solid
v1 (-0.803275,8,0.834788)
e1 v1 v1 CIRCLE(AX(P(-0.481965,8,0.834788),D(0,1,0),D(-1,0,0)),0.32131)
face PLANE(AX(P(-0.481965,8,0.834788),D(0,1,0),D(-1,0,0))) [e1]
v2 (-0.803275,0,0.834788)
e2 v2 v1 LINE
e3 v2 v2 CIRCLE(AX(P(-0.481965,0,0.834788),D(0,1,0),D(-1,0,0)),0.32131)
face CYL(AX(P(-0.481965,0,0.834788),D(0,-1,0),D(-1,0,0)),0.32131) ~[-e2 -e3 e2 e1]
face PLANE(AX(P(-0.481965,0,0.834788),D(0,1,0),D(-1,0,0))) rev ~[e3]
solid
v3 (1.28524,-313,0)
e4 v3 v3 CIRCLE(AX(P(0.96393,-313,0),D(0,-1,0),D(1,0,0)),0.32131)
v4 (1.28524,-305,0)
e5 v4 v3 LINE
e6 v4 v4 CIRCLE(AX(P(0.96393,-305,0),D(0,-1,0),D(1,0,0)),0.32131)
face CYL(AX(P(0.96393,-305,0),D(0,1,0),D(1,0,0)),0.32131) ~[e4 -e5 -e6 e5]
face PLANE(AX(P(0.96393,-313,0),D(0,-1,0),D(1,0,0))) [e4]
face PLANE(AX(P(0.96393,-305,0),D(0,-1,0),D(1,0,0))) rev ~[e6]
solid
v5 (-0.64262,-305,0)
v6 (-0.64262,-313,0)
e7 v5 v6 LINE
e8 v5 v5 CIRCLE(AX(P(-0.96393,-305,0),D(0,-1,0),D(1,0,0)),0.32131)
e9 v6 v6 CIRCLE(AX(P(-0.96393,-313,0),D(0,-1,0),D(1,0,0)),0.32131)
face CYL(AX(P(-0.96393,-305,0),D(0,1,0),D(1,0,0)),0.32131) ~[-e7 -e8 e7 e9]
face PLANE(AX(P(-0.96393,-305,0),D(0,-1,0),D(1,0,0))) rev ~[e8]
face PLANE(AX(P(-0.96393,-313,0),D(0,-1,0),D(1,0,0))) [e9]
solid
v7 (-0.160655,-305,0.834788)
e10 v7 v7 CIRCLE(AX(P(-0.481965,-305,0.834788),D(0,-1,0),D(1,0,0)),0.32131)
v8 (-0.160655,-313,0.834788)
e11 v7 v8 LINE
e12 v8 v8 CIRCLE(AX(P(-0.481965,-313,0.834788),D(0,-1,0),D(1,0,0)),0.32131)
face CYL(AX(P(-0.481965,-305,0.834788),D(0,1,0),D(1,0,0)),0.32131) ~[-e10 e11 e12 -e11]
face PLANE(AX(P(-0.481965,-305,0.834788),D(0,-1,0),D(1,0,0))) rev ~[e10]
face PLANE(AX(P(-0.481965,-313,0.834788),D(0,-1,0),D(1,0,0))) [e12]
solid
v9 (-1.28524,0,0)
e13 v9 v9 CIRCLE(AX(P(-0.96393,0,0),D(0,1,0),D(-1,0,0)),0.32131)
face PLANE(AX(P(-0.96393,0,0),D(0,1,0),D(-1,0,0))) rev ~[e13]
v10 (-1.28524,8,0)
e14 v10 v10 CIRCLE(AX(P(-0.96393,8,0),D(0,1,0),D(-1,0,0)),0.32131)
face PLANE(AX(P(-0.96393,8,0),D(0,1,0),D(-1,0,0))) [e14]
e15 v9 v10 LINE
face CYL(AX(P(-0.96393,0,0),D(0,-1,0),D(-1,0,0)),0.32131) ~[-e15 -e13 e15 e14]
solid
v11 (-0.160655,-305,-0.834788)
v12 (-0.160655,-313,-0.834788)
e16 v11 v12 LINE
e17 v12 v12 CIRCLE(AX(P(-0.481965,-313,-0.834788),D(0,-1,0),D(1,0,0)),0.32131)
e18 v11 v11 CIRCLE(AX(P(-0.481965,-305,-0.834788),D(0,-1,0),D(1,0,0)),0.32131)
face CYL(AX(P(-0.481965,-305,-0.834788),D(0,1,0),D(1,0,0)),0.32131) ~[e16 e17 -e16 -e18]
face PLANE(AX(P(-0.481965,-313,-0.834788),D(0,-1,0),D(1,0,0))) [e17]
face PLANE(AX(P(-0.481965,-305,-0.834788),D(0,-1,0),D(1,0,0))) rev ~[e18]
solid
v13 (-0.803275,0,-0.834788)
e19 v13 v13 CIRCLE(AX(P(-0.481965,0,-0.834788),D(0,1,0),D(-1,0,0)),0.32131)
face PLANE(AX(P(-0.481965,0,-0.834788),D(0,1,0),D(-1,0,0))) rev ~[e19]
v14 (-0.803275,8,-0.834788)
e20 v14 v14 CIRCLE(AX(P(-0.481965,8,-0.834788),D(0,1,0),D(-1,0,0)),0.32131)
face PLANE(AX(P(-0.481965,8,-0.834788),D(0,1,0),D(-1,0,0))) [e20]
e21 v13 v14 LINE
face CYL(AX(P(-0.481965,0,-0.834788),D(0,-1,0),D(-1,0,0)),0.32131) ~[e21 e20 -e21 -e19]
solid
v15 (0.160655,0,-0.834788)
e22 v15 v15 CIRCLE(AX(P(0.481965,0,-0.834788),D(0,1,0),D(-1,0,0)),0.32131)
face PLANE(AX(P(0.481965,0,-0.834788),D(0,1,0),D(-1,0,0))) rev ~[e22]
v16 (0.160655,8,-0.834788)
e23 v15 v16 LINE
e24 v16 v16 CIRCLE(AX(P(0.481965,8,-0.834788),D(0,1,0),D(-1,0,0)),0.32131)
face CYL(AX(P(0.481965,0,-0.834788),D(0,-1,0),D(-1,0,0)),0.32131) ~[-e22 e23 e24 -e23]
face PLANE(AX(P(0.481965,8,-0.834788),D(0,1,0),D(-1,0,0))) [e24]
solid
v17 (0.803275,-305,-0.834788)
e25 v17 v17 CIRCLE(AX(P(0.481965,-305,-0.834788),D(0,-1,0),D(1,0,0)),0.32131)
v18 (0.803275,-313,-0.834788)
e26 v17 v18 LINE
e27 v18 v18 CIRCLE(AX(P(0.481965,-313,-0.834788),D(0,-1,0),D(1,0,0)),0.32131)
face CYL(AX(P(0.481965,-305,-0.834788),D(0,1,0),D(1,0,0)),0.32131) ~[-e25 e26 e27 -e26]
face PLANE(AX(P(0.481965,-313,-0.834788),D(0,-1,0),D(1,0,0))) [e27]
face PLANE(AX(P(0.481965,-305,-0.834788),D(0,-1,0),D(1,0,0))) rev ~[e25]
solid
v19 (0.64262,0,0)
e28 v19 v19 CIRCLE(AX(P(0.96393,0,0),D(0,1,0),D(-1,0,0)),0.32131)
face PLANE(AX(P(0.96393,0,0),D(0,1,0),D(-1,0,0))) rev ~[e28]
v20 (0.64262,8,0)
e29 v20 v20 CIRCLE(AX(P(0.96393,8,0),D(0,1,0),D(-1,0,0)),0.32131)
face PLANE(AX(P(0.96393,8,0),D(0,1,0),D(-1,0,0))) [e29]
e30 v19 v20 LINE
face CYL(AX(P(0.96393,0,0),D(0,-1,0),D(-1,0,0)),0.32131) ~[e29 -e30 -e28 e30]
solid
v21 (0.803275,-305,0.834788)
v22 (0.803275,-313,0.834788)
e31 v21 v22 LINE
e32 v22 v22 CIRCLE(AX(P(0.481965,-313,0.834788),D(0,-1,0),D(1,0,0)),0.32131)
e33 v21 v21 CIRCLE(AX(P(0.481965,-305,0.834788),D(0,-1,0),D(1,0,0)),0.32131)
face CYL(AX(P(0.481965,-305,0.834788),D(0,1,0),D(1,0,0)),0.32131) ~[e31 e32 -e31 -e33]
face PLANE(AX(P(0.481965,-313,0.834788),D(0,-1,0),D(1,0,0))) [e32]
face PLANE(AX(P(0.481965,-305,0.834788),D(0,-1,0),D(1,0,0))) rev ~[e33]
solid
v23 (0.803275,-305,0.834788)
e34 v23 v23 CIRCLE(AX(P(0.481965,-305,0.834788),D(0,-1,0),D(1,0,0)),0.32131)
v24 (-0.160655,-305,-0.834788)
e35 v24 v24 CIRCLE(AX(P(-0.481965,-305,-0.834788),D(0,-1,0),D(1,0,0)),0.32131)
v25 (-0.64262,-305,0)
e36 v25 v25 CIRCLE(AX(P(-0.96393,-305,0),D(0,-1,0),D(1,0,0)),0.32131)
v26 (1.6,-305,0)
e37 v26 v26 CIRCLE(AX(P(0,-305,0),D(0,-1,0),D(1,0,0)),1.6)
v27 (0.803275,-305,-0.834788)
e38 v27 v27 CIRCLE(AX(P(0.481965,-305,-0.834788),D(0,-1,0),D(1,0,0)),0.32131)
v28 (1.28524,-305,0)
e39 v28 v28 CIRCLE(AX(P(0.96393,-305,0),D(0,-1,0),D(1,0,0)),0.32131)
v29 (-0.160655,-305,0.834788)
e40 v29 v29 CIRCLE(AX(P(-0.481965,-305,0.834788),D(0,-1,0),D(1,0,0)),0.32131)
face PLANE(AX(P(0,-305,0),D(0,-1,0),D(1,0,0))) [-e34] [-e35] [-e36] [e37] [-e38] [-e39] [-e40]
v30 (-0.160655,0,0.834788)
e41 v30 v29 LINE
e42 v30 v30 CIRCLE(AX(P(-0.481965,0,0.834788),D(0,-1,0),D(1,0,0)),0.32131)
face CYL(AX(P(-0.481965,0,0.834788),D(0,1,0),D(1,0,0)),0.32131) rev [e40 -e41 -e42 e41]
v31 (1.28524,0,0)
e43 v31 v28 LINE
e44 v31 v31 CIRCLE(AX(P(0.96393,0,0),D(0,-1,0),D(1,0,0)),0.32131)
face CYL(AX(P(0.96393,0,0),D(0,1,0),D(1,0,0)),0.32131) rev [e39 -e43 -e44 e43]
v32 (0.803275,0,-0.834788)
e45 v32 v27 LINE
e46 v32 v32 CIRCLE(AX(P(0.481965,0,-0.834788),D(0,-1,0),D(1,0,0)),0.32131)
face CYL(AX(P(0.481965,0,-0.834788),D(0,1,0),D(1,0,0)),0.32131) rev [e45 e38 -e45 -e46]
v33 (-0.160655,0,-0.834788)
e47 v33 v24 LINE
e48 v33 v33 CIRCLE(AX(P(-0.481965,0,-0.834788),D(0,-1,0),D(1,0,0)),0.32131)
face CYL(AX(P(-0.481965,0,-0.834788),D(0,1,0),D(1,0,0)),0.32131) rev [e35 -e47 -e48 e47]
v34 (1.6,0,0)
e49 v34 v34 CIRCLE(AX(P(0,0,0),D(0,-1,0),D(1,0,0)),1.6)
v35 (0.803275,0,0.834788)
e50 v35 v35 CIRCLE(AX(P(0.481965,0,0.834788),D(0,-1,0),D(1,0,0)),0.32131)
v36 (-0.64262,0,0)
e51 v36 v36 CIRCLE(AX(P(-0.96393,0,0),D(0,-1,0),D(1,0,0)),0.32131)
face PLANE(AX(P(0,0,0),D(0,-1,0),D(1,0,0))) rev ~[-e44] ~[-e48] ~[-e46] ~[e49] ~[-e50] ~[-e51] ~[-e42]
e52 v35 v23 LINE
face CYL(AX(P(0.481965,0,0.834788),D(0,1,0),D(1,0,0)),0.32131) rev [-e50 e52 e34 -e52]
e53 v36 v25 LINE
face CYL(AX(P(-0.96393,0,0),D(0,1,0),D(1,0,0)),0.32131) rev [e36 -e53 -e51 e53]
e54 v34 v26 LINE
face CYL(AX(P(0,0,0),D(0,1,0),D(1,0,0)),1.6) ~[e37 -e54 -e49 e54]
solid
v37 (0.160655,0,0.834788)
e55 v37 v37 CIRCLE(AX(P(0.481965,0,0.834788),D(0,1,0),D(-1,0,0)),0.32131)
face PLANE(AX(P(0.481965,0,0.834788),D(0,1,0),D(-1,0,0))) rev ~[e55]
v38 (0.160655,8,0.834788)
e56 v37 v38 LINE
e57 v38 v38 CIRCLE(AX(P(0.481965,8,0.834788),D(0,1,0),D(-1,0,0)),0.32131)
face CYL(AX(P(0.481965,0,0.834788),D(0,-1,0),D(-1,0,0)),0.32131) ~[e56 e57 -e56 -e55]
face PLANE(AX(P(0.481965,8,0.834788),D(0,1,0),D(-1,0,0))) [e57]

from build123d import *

# Parameters (mm, degrees)
F0_R     = 1.6
F0_R_2   = 0.32131
F1_DEPTH = 305
F2_R     = 0.32131
F3_DEPTH = 8
F4_R     = 0.32131
F5_DEPTH = 8


with BuildPart() as f1:
    # F0 (on Front) → F1 (new body)
    with BuildSketch(Plane.XZ):
        Circle(F0_R)
        with Locations((-0.481965, -0.8347878675)):
            Circle(F0_R_2, mode=Mode.SUBTRACT)
        with Locations((0.481965, -0.8347878675)):
            Circle(F0_R_2, mode=Mode.SUBTRACT)
        with Locations((-0.96393, 0)):
            Circle(F0_R_2, mode=Mode.SUBTRACT)
        with Locations((-0.481965, 0.8347878675)):
            Circle(F0_R_2, mode=Mode.SUBTRACT)
        with Locations((0.96393, 0)):
            Circle(F0_R_2, mode=Mode.SUBTRACT)
        with Locations((0.481965, 0.8347878675)):
            Circle(F0_R_2, mode=Mode.SUBTRACT)
    extrude(amount=F1_DEPTH)


with BuildPart() as f3:
    # F2 (on face) → F3 (new body)
    with BuildSketch(Plane.XZ.offset(305)):
        with Locations((-0.481965, 0.8347878675)):
            Circle(F2_R)
    extrude(amount=F3_DEPTH)


with BuildPart() as f3b:
    # F2 (on face) → F3, piece 2 (new body)
    with BuildSketch(Plane.XZ.offset(305)):
        with Locations((0.481965, 0.8347878675)):
            Circle(F2_R)
    extrude(amount=F3_DEPTH)


with BuildPart() as f3c:
    # F2 (on face) → F3, piece 3 (new body)
    with BuildSketch(Plane.XZ.offset(305)):
        with Locations((-0.96393, 0)):
            Circle(F2_R)
    extrude(amount=F3_DEPTH)


with BuildPart() as f3d:
    # F2 (on face) → F3, piece 4 (new body)
    with BuildSketch(Plane.XZ.offset(305)):
        with Locations((-0.481965, -0.8347878675)):
            Circle(F2_R)
    extrude(amount=F3_DEPTH)


with BuildPart() as f3e:
    # F2 (on face) → F3, piece 5 (new body)
    with BuildSketch(Plane.XZ.offset(305)):
        with Locations((0.481965, -0.8347878675)):
            Circle(F2_R)
    extrude(amount=F3_DEPTH)


with BuildPart() as f3f:
    # F2 (on face) → F3, piece 6 (new body)
    with BuildSketch(Plane.XZ.offset(305)):
        with Locations((0.96393, 0)):
            Circle(F2_R)
    extrude(amount=F3_DEPTH)


with BuildPart() as f5:
    # F4 (on face) → F5 (new body)
    with BuildSketch(Plane(origin=(0, 0, 0), x_dir=(-1, 0, 0), z_dir=(0, 1, 0))):
        with Locations((0.481965, -0.8347878675)):
            Circle(F4_R)
    extrude(amount=F5_DEPTH)


with BuildPart() as f5b:
    # F4 (on face) → F5, piece 2 (new body)
    with BuildSketch(Plane(origin=(0, 0, 0), x_dir=(-1, 0, 0), z_dir=(0, 1, 0))):
        with Locations((-0.481965, -0.8347878675)):
            Circle(F4_R)
    extrude(amount=F5_DEPTH)


with BuildPart() as f5c:
    # F4 (on face) → F5, piece 3 (new body)
    with BuildSketch(Plane(origin=(0, 0, 0), x_dir=(-1, 0, 0), z_dir=(0, 1, 0))):
        with Locations((0.96393, 0)):
            Circle(F4_R)
    extrude(amount=F5_DEPTH)


with BuildPart() as f5d:
    # F4 (on face) → F5, piece 4 (new body)
    with BuildSketch(Plane(origin=(0, 0, 0), x_dir=(-1, 0, 0), z_dir=(0, 1, 0))):
        with Locations((0.481965, 0.8347878675)):
            Circle(F4_R)
    extrude(amount=F5_DEPTH)


with BuildPart() as f5e:
    # F4 (on face) → F5, piece 5 (new body)
    with BuildSketch(Plane(origin=(0, 0, 0), x_dir=(-1, 0, 0), z_dir=(0, 1, 0))):
        with Locations((-0.96393, 0)):
            Circle(F4_R)
    extrude(amount=F5_DEPTH)


with BuildPart() as f5f:
    # F4 (on face) → F5, piece 6 (new body)
    with BuildSketch(Plane(origin=(0, 0, 0), x_dir=(-1, 0, 0), z_dir=(0, 1, 0))):
        with Locations((-0.481965, 0.8347878675)):
            Circle(F4_R)
    extrude(amount=F5_DEPTH)


solid = Compound([f1.part, f3.part, f3b.part, f3c.part, f3d.part, f3e.part, f3f.part, f5.part, f5b.part, f5c.part, f5d.part, f5e.part, f5f.part])
